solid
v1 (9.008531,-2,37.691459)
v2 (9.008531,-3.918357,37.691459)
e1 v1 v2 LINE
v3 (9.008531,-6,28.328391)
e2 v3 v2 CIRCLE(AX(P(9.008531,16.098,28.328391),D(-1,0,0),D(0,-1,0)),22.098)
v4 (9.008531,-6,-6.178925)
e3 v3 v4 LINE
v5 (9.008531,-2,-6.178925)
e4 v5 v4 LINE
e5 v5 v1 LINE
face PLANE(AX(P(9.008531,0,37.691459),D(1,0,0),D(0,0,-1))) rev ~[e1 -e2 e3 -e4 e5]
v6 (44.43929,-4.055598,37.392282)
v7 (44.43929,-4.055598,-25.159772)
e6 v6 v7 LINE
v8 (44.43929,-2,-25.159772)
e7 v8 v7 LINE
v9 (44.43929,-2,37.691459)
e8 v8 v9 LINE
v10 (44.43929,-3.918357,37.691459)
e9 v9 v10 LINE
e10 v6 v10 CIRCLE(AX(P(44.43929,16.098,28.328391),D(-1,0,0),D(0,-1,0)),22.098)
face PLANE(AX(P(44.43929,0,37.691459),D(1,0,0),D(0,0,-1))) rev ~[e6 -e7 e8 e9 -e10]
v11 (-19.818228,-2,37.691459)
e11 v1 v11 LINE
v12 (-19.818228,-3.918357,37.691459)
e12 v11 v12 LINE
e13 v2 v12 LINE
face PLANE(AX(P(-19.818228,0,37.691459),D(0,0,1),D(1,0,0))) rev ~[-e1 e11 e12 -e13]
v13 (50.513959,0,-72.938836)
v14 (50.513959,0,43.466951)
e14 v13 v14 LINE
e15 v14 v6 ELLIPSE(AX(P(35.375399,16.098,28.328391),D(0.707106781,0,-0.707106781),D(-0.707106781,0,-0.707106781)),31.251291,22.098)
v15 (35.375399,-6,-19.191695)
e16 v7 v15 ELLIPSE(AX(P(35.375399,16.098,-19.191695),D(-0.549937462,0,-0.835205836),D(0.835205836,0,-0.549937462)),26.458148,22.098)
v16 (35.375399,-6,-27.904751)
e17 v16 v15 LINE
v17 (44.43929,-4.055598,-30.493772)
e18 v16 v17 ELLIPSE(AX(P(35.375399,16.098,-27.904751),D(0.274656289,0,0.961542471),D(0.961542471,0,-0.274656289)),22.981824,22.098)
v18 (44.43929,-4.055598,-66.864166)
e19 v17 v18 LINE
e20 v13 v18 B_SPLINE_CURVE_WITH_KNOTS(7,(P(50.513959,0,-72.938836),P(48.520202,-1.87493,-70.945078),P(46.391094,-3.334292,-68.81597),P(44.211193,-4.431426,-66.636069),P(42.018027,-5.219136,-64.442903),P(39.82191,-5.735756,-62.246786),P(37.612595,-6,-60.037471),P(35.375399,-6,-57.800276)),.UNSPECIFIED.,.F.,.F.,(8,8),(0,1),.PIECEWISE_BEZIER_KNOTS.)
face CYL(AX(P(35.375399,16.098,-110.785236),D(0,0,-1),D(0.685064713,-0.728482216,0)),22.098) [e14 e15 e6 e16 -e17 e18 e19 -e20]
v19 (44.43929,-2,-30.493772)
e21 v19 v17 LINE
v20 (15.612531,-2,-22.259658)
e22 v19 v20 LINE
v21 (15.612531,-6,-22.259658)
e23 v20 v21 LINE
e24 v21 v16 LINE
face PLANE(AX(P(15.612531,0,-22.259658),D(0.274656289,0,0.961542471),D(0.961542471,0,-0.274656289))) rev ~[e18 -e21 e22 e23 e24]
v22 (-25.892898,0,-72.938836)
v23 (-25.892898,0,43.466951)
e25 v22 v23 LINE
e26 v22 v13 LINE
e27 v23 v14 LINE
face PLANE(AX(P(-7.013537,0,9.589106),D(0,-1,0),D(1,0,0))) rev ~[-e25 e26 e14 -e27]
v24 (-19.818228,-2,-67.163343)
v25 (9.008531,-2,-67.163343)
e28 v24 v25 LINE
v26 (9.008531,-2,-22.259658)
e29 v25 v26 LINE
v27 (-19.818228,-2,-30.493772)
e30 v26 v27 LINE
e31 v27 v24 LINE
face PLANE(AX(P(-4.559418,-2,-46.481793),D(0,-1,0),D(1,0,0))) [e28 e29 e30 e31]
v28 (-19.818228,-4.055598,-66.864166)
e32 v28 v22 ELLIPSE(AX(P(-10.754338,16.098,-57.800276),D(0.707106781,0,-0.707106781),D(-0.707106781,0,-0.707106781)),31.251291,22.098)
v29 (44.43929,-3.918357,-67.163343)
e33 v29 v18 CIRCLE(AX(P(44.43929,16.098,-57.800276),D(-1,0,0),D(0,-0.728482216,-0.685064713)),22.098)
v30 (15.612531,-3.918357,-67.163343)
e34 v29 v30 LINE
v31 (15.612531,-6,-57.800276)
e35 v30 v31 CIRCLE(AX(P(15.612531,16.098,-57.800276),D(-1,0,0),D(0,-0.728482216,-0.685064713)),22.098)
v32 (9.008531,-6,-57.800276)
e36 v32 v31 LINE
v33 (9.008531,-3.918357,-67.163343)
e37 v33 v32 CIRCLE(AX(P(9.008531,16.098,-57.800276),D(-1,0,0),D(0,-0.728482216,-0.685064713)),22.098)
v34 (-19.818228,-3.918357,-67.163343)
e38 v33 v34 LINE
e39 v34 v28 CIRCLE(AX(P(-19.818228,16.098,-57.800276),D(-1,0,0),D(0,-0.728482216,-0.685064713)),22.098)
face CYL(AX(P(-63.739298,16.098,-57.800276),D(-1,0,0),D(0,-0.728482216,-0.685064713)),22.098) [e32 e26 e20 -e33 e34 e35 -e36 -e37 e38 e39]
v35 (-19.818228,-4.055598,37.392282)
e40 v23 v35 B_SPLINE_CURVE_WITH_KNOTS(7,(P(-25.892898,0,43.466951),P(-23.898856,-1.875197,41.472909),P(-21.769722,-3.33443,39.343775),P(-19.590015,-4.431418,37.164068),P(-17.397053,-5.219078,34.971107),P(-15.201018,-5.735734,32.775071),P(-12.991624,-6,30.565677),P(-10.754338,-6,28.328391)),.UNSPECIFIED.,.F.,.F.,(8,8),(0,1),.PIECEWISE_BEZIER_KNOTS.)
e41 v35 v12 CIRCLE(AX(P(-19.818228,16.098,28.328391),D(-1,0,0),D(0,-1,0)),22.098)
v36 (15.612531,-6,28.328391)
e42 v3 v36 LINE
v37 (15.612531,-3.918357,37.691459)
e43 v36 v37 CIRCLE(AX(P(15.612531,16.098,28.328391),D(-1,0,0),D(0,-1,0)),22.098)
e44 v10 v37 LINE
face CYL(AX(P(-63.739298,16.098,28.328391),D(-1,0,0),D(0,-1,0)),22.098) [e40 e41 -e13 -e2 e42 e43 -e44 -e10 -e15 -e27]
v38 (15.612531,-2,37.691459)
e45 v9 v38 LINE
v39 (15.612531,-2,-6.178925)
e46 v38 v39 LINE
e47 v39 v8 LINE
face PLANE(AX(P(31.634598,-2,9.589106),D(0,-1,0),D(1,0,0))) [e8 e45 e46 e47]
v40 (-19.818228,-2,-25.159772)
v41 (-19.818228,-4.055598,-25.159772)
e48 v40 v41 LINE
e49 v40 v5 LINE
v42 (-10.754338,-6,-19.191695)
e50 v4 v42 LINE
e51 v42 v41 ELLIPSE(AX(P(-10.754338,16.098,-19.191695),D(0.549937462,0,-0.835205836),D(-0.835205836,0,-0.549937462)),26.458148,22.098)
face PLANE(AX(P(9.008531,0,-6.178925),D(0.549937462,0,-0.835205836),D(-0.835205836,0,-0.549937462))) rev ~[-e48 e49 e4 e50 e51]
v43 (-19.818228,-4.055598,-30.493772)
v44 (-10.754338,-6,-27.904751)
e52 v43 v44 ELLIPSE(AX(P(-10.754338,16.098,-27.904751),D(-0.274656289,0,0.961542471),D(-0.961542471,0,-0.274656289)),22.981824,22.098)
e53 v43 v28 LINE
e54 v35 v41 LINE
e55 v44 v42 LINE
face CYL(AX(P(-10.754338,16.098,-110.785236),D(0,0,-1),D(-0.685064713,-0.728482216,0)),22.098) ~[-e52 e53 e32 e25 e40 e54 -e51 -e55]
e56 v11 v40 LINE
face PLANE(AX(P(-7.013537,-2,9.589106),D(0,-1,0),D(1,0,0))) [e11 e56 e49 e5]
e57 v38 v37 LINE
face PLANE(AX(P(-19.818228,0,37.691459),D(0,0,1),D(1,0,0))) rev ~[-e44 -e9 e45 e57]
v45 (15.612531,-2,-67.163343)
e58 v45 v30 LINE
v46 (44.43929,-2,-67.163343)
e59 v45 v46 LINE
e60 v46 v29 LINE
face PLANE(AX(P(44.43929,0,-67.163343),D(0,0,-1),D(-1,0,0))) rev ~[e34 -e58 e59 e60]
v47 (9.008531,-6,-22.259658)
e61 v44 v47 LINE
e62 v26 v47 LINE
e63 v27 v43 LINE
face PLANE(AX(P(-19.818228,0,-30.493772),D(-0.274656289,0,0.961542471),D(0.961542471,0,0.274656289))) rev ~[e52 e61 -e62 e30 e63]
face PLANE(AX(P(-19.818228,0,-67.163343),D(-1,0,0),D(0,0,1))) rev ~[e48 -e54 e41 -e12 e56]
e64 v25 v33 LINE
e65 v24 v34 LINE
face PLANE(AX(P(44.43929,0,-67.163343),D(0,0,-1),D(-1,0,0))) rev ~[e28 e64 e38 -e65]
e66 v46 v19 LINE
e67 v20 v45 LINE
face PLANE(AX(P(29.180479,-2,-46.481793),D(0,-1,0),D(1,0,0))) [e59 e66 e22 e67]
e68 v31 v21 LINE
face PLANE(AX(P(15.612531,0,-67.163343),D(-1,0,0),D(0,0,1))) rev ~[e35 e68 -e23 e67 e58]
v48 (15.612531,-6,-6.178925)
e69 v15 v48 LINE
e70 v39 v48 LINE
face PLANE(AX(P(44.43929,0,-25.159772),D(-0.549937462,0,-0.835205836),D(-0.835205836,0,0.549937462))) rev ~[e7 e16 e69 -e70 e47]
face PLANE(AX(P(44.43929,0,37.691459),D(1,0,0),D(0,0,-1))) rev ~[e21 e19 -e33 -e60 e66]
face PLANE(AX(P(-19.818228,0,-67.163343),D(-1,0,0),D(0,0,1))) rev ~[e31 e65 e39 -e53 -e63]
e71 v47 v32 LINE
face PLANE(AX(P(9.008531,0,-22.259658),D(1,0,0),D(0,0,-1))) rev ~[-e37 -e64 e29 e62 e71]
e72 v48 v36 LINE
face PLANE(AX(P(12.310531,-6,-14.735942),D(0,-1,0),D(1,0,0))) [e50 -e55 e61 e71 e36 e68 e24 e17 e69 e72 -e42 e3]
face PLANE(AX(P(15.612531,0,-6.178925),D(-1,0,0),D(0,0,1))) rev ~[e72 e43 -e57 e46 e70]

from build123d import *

# Parameters (mm, degrees)
F1_DEPTH    = 6
F0_W        = 76.4068576
F0_H        = 116.405787
F2_DEPTH    = 6
F3_DEPTH    = 2
F4_T1_DEPTH = 192.098587186
F4_T3_DEPTH = 152.099657786


# Not quite as in the source:
# - a fillet or chamfer that OpenCascade refuses, or shapes differently, is made with other operations: its cross-section is extruded or revolved along the edge and cut away or added
# - a feature names something its author has since deleted; it is built from what else it names


with BuildPart() as f1:
    # F0 (on Front) → F1 (new body)
    with BuildSketch(Plane.XZ):
        Polygon((15.6125306649, 37.6914590597), (9.0085306649, 37.6914590597), (9.0085306649, -6.1789248552), (-19.818228389, -25.1597724855), (-19.818228389, -30.4937724855), (9.0085306649, -22.2596581395), (9.0085306649, -67.1633433111), (15.6125306649, -67.1633433111), (15.6125306649, -22.2596581395), (44.4392897189, -30.4937724855), (44.4392897189, -25.1597724855), (15.6125306649, -6.1789248552), align=None)
    extrude(amount=F1_DEPTH)

    # F0 (on Front) → F2 (join)
    with BuildSketch(Plane.XZ):
        with Locations((12.3105306649, -14.7359421257)):
            Rectangle(F0_W, F0_H)
        Polygon((-19.818228389, -25.1597724855), (-19.818228389, 37.6914590597), (9.0085306649, 37.6914590597), (15.6125306649, 37.6914590597), (44.4392897189, 37.6914590597), (44.4392897189, -25.1597724855), (44.4392897189, -30.4937724855), (44.4392897189, -67.1633433111), (15.6125306649, -67.1633433111), (9.0085306649, -67.1633433111), (-19.818228389, -67.1633433111), (-19.818228389, -30.4937724855), align=None, mode=Mode.SUBTRACT)
    extrude(amount=F2_DEPTH)

    # F0 (on Front) → F3 (join)
    with BuildSketch(Plane.XZ):
        Polygon((9.0085306649, 37.6914590597), (-19.818228389, 37.6914590597), (-19.818228389, -25.1597724855), (9.0085306649, -6.1789248552), align=None)
        Polygon((44.4392897189, -67.1633433111), (44.4392897189, -30.4937724855), (15.6125306649, -22.2596581395), (15.6125306649, -67.1633433111), align=None)
        Polygon((9.0085306649, -22.2596581395), (-19.818228389, -30.4937724855), (-19.818228389, -67.1633433111), (9.0085306649, -67.1633433111), align=None)
        Polygon((44.4392897189, 37.6914590597), (15.6125306649, 37.6914590597), (15.6125306649, -6.1789248552), (44.4392897189, -25.1597724855), align=None)
    extrude(amount=F3_DEPTH)

    # F4: fillet of radius 22.098 on 4 edges, made by hand

    # F4_s2 → F4_t1 (cut)
    with BuildSketch(Plane.XY.offset(-110.7852357187)):
        with BuildLine():
            ThreePointArc((-25.8928981351, 0), (-18.8964508458, -4.445310444), (-10.7543380979, -6))
            Line((-10.7543380979, -6), (-25.8928981351, -6))
            Line((-25.8928981351, -6), (-25.8928981351, 0))
        make_face()
        with BuildLine():
            ThreePointArc((50.5139594649, 0), (43.5175121757, -4.445310444), (35.3753994277, -6))
            Line((35.3753994277, -6), (50.5139594649, -6))
            Line((50.5139594649, -6), (50.5139594649, 0))
        make_face()
    extrude(amount=F4_T1_DEPTH, mode=Mode.SUBTRACT)

    # F4_s4 → F4_t3 (cut)
    with BuildSketch(Plane.YZ.offset(-63.7392982281)):
        with BuildLine():
            ThreePointArc((0, -72.9388356257), (-4.445310444, -65.9423883364), (-6, -57.8002755885))
            Line((-6, -57.8002755885), (-6, -72.9388356257))
            Line((-6, -72.9388356257), (0, -72.9388356257))
        make_face()
        with BuildLine():
            ThreePointArc((-6, 28.3283913371), (-4.445310444, 36.4705040851), (0, 43.4669513743))
            Line((0, 43.4669513743), (-6, 43.4669513743))
            Line((-6, 43.4669513743), (-6, 28.3283913371))
        make_face()
    extrude(amount=F4_T3_DEPTH, mode=Mode.SUBTRACT)


solid = f1.part
